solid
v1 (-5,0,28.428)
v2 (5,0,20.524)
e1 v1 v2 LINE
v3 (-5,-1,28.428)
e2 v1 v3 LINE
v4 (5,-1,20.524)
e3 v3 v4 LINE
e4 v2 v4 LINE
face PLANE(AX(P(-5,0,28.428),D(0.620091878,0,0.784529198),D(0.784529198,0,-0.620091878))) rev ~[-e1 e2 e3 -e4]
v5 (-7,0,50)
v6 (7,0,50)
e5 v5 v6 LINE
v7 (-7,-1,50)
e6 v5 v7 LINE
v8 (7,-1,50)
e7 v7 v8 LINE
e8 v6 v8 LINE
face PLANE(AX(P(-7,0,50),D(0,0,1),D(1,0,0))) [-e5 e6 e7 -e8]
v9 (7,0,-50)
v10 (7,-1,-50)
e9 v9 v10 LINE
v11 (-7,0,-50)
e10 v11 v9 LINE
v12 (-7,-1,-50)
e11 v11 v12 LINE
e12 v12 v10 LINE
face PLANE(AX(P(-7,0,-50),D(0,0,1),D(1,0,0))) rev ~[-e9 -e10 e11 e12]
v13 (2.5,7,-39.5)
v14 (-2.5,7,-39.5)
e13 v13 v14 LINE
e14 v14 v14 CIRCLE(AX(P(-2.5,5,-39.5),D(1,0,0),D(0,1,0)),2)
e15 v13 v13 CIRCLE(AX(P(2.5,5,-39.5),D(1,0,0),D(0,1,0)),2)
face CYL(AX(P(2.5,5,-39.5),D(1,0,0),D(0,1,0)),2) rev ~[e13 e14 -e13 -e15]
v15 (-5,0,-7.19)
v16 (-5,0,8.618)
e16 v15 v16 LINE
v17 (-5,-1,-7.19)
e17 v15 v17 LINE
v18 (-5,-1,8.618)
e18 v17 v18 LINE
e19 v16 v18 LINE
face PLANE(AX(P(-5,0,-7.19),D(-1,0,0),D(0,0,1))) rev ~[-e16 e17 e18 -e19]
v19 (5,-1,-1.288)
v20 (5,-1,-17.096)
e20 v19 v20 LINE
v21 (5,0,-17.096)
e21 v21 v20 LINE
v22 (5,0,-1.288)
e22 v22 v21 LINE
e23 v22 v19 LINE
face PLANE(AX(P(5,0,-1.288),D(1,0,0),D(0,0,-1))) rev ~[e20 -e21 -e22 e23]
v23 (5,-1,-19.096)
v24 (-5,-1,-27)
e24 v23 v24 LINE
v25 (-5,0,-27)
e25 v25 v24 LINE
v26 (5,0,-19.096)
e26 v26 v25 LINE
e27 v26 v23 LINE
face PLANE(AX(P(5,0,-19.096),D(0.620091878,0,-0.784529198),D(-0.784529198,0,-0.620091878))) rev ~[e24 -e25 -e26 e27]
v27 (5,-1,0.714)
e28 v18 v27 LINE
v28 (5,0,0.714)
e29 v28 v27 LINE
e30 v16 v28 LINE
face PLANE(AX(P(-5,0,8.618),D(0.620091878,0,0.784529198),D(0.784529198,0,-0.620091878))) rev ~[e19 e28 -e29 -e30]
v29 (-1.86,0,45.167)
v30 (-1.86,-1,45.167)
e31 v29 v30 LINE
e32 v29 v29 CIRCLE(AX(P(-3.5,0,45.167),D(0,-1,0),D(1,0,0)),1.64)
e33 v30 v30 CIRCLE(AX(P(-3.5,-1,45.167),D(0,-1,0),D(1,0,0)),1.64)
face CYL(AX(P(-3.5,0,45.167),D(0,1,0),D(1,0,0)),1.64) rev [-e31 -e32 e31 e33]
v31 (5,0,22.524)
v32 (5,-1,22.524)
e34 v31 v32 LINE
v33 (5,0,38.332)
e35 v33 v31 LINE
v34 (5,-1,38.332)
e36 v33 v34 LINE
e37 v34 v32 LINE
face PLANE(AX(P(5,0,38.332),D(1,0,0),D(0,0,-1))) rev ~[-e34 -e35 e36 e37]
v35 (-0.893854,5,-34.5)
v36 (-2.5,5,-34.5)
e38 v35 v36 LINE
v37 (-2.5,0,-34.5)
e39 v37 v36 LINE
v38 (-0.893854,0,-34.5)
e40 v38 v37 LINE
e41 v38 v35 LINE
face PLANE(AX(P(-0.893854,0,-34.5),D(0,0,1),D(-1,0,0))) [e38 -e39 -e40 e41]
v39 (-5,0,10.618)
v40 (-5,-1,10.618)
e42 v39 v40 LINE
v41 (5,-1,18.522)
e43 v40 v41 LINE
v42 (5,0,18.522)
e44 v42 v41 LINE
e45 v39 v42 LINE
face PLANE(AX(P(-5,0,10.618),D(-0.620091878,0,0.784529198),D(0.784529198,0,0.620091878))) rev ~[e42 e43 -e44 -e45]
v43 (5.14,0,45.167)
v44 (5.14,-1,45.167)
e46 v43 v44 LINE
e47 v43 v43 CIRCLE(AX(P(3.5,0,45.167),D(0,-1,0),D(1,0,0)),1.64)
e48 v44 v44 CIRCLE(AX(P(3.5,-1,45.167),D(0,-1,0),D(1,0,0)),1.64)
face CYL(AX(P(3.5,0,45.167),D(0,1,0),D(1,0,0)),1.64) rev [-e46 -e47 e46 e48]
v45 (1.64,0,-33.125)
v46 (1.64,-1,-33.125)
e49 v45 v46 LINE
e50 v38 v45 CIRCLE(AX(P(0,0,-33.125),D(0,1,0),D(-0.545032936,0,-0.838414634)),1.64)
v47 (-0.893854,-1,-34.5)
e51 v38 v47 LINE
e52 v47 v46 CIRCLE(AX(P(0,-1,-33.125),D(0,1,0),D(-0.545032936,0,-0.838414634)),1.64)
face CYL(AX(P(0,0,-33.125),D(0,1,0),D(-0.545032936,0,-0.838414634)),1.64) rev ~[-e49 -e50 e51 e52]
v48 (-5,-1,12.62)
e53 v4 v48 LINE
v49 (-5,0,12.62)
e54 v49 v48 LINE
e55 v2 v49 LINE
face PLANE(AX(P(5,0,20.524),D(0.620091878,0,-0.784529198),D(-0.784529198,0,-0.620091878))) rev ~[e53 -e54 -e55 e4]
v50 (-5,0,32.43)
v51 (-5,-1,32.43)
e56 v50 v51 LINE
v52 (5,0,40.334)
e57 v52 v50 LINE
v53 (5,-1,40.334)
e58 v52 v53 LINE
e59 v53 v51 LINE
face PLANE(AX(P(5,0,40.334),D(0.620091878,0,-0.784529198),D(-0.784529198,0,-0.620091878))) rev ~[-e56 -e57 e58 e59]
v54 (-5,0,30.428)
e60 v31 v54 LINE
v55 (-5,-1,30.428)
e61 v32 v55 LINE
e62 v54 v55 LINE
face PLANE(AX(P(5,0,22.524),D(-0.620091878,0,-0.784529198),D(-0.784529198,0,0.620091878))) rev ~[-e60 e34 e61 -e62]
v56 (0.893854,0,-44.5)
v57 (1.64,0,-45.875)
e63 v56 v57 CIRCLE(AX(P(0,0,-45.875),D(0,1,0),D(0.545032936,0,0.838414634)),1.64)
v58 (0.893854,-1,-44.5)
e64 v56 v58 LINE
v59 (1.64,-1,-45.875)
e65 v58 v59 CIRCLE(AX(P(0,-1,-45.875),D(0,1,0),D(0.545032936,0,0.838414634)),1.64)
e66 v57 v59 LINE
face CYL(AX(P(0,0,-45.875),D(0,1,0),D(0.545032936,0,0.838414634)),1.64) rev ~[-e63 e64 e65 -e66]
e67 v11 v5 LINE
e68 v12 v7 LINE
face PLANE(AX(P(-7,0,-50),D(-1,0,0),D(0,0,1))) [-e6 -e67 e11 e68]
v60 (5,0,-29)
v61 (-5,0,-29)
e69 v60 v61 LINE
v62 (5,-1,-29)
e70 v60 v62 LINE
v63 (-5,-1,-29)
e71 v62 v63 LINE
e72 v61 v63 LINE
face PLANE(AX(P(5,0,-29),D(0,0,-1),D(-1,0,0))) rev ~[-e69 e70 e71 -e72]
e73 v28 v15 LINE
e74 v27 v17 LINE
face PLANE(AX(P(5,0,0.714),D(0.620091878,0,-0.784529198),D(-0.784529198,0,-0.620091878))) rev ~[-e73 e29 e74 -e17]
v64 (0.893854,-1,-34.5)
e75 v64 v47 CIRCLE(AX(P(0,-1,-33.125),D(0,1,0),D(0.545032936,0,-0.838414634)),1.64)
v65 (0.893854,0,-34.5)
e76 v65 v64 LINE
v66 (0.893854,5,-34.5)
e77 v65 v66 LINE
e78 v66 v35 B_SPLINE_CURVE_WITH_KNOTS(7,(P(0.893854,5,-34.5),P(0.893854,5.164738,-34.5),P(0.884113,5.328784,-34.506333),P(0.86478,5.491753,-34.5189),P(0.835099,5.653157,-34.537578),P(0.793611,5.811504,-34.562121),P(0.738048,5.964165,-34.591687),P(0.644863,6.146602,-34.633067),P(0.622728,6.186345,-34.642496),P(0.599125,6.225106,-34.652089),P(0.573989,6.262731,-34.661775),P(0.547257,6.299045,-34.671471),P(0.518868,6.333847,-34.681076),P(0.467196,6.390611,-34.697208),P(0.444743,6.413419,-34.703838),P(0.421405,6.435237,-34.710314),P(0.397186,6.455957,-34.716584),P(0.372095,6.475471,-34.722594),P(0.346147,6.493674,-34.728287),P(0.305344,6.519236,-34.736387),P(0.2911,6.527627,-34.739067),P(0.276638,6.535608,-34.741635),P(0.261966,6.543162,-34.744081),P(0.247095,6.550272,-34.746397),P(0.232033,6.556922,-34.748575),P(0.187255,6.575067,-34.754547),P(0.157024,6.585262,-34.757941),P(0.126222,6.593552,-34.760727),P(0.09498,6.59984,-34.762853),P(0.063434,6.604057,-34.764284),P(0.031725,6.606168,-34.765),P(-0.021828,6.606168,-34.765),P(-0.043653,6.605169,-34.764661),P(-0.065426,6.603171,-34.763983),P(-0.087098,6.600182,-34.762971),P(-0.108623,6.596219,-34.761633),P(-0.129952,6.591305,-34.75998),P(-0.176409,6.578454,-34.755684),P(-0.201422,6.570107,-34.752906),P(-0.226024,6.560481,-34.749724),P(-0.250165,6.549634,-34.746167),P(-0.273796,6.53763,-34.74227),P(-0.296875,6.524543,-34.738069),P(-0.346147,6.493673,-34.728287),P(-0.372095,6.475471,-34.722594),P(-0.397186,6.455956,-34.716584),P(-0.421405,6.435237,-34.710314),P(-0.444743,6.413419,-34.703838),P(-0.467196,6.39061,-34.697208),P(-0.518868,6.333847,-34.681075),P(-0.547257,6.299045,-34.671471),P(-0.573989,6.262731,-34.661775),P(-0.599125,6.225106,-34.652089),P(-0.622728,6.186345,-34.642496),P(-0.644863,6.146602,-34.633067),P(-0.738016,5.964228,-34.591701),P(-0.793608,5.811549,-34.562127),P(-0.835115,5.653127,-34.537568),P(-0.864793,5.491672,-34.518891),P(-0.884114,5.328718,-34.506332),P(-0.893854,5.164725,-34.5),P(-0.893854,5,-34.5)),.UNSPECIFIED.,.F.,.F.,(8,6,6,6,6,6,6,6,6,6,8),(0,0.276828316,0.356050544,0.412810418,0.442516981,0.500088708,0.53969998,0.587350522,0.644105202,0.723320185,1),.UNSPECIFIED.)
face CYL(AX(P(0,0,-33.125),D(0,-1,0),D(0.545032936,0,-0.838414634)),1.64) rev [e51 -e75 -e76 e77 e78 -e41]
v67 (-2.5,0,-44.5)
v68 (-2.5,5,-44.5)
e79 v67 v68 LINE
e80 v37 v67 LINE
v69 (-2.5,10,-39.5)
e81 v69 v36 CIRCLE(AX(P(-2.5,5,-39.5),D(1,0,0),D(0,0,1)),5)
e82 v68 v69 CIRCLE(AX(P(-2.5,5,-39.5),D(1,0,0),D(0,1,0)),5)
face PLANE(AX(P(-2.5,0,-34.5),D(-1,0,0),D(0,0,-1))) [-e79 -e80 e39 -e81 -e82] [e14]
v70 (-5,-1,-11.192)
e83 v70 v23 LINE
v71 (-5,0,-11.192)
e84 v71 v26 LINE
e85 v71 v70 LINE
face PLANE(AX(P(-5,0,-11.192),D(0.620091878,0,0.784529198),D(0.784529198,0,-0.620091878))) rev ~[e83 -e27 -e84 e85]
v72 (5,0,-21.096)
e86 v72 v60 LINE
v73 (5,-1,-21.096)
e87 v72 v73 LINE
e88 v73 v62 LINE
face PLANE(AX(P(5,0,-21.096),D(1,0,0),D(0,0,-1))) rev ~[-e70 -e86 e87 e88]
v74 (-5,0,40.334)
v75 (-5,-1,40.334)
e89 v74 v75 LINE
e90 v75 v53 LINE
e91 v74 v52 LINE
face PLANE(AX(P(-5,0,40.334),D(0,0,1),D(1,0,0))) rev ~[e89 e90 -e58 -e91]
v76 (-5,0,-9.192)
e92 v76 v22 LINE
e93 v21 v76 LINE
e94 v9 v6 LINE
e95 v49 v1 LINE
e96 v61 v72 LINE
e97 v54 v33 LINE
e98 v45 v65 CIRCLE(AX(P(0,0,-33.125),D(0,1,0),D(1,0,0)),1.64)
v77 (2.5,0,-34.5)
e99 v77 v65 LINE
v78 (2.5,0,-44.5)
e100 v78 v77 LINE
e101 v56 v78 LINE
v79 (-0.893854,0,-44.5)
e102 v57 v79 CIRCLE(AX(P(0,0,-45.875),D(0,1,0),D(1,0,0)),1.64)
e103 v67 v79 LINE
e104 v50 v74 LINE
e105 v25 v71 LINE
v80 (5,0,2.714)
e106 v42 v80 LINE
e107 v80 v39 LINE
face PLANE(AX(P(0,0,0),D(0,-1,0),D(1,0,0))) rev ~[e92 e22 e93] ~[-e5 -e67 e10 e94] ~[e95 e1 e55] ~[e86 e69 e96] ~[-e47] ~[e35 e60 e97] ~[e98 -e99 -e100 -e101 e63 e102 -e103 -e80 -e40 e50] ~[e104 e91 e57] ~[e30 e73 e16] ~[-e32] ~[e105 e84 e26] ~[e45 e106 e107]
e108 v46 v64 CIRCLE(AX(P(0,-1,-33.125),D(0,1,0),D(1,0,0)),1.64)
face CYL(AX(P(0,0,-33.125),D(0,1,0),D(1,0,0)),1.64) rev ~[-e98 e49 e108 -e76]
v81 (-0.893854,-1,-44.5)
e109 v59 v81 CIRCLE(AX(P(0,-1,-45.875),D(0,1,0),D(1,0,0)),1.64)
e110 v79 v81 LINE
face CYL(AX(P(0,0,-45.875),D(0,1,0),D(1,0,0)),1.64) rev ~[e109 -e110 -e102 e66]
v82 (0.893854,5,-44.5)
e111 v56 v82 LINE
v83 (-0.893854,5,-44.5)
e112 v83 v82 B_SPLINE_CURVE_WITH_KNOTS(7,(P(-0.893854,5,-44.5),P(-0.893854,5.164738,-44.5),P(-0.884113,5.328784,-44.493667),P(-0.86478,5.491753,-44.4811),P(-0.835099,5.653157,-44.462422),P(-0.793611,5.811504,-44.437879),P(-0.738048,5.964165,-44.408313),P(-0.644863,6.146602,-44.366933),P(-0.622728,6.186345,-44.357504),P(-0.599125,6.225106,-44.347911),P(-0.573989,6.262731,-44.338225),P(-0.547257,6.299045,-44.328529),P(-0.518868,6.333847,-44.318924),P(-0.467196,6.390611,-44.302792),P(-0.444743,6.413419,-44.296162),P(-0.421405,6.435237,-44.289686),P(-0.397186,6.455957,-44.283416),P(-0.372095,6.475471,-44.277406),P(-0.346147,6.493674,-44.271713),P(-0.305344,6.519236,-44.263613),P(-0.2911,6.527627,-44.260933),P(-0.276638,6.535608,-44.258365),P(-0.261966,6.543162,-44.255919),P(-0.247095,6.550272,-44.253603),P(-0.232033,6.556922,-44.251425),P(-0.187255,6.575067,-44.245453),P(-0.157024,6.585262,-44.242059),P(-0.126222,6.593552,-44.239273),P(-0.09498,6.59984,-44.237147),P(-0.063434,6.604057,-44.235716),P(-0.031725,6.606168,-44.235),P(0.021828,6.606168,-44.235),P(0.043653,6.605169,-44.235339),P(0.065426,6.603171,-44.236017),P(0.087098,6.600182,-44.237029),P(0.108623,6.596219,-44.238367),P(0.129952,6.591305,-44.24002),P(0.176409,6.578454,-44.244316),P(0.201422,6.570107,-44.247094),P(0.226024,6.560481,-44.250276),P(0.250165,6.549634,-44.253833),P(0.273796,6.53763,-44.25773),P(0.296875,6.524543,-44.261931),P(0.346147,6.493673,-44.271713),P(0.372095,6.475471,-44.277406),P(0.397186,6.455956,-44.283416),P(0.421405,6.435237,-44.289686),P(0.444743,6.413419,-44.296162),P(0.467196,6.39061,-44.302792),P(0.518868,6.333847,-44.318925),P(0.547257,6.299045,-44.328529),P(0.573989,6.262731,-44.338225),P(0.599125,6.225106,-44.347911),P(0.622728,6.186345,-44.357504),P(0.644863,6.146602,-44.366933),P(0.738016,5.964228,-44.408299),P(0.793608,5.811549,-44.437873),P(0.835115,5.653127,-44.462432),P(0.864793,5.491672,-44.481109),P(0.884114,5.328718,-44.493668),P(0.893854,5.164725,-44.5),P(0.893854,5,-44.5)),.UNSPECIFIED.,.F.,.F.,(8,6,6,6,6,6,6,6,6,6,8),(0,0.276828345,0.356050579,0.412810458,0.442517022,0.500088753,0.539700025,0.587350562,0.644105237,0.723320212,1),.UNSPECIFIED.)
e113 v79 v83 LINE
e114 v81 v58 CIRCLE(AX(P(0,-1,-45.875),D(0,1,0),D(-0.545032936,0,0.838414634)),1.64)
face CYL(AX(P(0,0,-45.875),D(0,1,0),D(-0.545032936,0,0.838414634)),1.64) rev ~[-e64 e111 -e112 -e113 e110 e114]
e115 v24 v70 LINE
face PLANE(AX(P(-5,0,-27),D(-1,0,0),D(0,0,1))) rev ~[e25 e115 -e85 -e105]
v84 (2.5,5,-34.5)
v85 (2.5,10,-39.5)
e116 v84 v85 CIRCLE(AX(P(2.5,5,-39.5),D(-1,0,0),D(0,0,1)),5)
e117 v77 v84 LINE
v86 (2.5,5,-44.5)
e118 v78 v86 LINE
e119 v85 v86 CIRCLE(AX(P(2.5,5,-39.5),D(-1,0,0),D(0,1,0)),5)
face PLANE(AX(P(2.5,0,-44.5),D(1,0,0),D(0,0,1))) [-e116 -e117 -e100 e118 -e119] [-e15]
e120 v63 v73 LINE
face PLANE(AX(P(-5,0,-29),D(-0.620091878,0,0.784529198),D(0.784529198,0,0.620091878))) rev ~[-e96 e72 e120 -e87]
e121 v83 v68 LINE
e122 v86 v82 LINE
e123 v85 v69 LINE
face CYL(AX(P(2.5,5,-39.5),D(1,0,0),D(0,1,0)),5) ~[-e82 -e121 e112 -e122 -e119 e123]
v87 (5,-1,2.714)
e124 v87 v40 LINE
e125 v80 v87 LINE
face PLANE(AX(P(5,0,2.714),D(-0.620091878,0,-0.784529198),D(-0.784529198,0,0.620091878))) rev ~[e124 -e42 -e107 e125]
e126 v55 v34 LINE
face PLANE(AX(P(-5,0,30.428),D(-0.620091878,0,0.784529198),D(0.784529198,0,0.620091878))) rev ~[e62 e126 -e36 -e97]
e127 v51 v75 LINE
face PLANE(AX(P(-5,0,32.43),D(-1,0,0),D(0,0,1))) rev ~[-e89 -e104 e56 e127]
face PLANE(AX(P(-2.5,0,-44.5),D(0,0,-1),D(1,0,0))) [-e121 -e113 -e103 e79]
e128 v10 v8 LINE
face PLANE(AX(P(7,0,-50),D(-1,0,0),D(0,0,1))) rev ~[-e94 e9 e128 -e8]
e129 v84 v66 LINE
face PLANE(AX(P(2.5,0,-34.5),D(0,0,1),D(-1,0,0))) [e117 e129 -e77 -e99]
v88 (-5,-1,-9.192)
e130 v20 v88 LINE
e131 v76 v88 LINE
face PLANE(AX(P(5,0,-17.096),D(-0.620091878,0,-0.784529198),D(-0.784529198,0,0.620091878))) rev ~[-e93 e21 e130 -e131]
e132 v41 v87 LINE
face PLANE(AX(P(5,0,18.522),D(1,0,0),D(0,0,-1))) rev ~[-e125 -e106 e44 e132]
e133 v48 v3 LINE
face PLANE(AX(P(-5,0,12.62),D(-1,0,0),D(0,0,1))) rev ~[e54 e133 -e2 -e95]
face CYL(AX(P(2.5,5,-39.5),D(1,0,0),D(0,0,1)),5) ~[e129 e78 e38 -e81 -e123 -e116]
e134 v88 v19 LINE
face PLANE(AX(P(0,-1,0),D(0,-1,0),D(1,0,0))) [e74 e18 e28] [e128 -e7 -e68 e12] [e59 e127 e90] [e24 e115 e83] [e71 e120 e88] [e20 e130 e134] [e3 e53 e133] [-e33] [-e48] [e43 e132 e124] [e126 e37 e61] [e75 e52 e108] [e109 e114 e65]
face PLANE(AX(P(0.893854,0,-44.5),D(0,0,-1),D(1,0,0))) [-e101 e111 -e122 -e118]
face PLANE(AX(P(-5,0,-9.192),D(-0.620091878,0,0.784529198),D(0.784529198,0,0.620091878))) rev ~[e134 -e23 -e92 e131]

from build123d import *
from build123d import SkipClean  # not in build123d's __all__

# Parameters (mm, degrees)
F0_W     = 14
F0_H     = 100
F0_R     = 1.64
F1_DEPTH = 1
F2_DEPTH = 10
F3_R     = 2
F4_DEPTH = 9.501


# Not quite as in the source:
# - after a boolean that leaves OpenCascade's solid faulty, fix() repairs it
# - a feature names something its author has since deleted; it is built from what else it names


with BuildPart() as f1:
    # F0 (on Front) → F1 (new body)
    with BuildSketch(Plane.XZ):
        Rectangle(F0_W, F0_H)
        with BuildLine():
            Line((-2.5, -44.5), (-2.5, -34.5))
            Line((-2.5, -34.5), (-0.8938540149, -34.5))
            ThreePointArc((-0.8938540149, -34.5), (-0.7822018331, -31.6835561779), (1.64, -33.125))
            ThreePointArc((1.64, -33.125), (1.4414438221, -33.9072018331), (0.8938540149, -34.5))
            Line((0.8938540149, -34.5), (2.5, -34.5))
            Line((2.5, -34.5), (2.5, -44.5))
            Line((2.5, -44.5), (0.8938540149, -44.5))
            ThreePointArc((0.8938540149, -44.5), (1.4414438221, -45.0927981669), (1.64, -45.875))
            ThreePointArc((1.64, -45.875), (-0.7822018331, -47.3164438221), (-0.8938540149, -44.5))
            Line((-0.8938540149, -44.5), (-2.5, -44.5))
        make_face(mode=Mode.SUBTRACT)
        Polygon((5, -21.096), (5, -29), (-5, -29), align=None, mode=Mode.SUBTRACT)
        Polygon((5, -19.096), (-5, -27), (-5, -11.192), align=None, mode=Mode.SUBTRACT)
        Polygon((5, -17.096), (-5, -9.192), (5, -1.288), align=None, mode=Mode.SUBTRACT)
        with Locations((-3.5, 45.167)):
            Circle(F0_R, mode=Mode.SUBTRACT)
        Polygon((-5, -7.19), (-5, 8.618), (5, 0.714), align=None, mode=Mode.SUBTRACT)
        Polygon((5, 18.522), (5, 2.714), (-5, 10.618), align=None, mode=Mode.SUBTRACT)
        Polygon((-5, 12.62), (-5, 28.428), (5, 20.524), align=None, mode=Mode.SUBTRACT)
        Polygon((5, 38.332), (5, 22.524), (-5, 30.428), align=None, mode=Mode.SUBTRACT)
        Polygon((5, 40.334), (-5, 32.43), (-5, 40.334), align=None, mode=Mode.SUBTRACT)
        with Locations((3.5, 45.167)):
            Circle(F0_R, mode=Mode.SUBTRACT)
        with BuildLine():
            Line((-0.8938540149, -34.5), (-2.5, -34.5))
            Line((-2.5, -34.5), (-2.5, -44.5))
            Line((-2.5, -44.5), (-0.8938540149, -44.5))
            ThreePointArc((-0.8938540149, -44.5), (0, -44.235), (0.8938540149, -44.5))
            Line((0.8938540149, -44.5), (2.5, -44.5))
            Line((2.5, -44.5), (2.5, -34.5))
            Line((2.5, -34.5), (0.8938540149, -34.5))
            ThreePointArc((0.8938540149, -34.5), (0, -34.765), (-0.8938540149, -34.5))
        make_face()
    extrude(amount=F1_DEPTH)

    # F0 (on Front) → F2 (join)
    with BuildSketch(Plane.XZ):
        with BuildLine():
            Line((-0.8938540149, -34.5), (-2.5, -34.5))
            Line((-2.5, -34.5), (-2.5, -44.5))
            Line((-2.5, -44.5), (-0.8938540149, -44.5))
            ThreePointArc((-0.8938540149, -44.5), (0, -44.235), (0.8938540149, -44.5))
            Line((0.8938540149, -44.5), (2.5, -44.5))
            Line((2.5, -44.5), (2.5, -34.5))
            Line((2.5, -34.5), (0.8938540149, -34.5))
            ThreePointArc((0.8938540149, -34.5), (0, -34.765), (-0.8938540149, -34.5))
        make_face()
    with SkipClean():  # cleaning this boolean's faces spoils the solid; the shape is the same uncleaned
        extrude(amount=-F2_DEPTH)

    # F3 (on face) → F4 (cut, through all)
    with BuildSketch(Plane.YZ.offset(2.5)):
        with BuildLine():
            Line((5, -44.5), (10, -44.5))
            Line((10, -44.5), (10, -39.5))
            ThreePointArc((10, -39.5), (8.5355339059, -43.0355339059), (5, -44.5))
        make_face()
        with Locations((5, -39.5)):
            Circle(F3_R)
        with BuildLine():
            ThreePointArc((5, -34.5), (8.5355339059, -35.9644660941), (10, -39.5))
            Line((10, -39.5), (10, -34.5))
            Line((10, -34.5), (5, -34.5))
        make_face()
    extrude(amount=-F4_DEPTH, mode=Mode.SUBTRACT)

    add(f1.part.fix(), mode=Mode.REPLACE)


solid = f1.part
